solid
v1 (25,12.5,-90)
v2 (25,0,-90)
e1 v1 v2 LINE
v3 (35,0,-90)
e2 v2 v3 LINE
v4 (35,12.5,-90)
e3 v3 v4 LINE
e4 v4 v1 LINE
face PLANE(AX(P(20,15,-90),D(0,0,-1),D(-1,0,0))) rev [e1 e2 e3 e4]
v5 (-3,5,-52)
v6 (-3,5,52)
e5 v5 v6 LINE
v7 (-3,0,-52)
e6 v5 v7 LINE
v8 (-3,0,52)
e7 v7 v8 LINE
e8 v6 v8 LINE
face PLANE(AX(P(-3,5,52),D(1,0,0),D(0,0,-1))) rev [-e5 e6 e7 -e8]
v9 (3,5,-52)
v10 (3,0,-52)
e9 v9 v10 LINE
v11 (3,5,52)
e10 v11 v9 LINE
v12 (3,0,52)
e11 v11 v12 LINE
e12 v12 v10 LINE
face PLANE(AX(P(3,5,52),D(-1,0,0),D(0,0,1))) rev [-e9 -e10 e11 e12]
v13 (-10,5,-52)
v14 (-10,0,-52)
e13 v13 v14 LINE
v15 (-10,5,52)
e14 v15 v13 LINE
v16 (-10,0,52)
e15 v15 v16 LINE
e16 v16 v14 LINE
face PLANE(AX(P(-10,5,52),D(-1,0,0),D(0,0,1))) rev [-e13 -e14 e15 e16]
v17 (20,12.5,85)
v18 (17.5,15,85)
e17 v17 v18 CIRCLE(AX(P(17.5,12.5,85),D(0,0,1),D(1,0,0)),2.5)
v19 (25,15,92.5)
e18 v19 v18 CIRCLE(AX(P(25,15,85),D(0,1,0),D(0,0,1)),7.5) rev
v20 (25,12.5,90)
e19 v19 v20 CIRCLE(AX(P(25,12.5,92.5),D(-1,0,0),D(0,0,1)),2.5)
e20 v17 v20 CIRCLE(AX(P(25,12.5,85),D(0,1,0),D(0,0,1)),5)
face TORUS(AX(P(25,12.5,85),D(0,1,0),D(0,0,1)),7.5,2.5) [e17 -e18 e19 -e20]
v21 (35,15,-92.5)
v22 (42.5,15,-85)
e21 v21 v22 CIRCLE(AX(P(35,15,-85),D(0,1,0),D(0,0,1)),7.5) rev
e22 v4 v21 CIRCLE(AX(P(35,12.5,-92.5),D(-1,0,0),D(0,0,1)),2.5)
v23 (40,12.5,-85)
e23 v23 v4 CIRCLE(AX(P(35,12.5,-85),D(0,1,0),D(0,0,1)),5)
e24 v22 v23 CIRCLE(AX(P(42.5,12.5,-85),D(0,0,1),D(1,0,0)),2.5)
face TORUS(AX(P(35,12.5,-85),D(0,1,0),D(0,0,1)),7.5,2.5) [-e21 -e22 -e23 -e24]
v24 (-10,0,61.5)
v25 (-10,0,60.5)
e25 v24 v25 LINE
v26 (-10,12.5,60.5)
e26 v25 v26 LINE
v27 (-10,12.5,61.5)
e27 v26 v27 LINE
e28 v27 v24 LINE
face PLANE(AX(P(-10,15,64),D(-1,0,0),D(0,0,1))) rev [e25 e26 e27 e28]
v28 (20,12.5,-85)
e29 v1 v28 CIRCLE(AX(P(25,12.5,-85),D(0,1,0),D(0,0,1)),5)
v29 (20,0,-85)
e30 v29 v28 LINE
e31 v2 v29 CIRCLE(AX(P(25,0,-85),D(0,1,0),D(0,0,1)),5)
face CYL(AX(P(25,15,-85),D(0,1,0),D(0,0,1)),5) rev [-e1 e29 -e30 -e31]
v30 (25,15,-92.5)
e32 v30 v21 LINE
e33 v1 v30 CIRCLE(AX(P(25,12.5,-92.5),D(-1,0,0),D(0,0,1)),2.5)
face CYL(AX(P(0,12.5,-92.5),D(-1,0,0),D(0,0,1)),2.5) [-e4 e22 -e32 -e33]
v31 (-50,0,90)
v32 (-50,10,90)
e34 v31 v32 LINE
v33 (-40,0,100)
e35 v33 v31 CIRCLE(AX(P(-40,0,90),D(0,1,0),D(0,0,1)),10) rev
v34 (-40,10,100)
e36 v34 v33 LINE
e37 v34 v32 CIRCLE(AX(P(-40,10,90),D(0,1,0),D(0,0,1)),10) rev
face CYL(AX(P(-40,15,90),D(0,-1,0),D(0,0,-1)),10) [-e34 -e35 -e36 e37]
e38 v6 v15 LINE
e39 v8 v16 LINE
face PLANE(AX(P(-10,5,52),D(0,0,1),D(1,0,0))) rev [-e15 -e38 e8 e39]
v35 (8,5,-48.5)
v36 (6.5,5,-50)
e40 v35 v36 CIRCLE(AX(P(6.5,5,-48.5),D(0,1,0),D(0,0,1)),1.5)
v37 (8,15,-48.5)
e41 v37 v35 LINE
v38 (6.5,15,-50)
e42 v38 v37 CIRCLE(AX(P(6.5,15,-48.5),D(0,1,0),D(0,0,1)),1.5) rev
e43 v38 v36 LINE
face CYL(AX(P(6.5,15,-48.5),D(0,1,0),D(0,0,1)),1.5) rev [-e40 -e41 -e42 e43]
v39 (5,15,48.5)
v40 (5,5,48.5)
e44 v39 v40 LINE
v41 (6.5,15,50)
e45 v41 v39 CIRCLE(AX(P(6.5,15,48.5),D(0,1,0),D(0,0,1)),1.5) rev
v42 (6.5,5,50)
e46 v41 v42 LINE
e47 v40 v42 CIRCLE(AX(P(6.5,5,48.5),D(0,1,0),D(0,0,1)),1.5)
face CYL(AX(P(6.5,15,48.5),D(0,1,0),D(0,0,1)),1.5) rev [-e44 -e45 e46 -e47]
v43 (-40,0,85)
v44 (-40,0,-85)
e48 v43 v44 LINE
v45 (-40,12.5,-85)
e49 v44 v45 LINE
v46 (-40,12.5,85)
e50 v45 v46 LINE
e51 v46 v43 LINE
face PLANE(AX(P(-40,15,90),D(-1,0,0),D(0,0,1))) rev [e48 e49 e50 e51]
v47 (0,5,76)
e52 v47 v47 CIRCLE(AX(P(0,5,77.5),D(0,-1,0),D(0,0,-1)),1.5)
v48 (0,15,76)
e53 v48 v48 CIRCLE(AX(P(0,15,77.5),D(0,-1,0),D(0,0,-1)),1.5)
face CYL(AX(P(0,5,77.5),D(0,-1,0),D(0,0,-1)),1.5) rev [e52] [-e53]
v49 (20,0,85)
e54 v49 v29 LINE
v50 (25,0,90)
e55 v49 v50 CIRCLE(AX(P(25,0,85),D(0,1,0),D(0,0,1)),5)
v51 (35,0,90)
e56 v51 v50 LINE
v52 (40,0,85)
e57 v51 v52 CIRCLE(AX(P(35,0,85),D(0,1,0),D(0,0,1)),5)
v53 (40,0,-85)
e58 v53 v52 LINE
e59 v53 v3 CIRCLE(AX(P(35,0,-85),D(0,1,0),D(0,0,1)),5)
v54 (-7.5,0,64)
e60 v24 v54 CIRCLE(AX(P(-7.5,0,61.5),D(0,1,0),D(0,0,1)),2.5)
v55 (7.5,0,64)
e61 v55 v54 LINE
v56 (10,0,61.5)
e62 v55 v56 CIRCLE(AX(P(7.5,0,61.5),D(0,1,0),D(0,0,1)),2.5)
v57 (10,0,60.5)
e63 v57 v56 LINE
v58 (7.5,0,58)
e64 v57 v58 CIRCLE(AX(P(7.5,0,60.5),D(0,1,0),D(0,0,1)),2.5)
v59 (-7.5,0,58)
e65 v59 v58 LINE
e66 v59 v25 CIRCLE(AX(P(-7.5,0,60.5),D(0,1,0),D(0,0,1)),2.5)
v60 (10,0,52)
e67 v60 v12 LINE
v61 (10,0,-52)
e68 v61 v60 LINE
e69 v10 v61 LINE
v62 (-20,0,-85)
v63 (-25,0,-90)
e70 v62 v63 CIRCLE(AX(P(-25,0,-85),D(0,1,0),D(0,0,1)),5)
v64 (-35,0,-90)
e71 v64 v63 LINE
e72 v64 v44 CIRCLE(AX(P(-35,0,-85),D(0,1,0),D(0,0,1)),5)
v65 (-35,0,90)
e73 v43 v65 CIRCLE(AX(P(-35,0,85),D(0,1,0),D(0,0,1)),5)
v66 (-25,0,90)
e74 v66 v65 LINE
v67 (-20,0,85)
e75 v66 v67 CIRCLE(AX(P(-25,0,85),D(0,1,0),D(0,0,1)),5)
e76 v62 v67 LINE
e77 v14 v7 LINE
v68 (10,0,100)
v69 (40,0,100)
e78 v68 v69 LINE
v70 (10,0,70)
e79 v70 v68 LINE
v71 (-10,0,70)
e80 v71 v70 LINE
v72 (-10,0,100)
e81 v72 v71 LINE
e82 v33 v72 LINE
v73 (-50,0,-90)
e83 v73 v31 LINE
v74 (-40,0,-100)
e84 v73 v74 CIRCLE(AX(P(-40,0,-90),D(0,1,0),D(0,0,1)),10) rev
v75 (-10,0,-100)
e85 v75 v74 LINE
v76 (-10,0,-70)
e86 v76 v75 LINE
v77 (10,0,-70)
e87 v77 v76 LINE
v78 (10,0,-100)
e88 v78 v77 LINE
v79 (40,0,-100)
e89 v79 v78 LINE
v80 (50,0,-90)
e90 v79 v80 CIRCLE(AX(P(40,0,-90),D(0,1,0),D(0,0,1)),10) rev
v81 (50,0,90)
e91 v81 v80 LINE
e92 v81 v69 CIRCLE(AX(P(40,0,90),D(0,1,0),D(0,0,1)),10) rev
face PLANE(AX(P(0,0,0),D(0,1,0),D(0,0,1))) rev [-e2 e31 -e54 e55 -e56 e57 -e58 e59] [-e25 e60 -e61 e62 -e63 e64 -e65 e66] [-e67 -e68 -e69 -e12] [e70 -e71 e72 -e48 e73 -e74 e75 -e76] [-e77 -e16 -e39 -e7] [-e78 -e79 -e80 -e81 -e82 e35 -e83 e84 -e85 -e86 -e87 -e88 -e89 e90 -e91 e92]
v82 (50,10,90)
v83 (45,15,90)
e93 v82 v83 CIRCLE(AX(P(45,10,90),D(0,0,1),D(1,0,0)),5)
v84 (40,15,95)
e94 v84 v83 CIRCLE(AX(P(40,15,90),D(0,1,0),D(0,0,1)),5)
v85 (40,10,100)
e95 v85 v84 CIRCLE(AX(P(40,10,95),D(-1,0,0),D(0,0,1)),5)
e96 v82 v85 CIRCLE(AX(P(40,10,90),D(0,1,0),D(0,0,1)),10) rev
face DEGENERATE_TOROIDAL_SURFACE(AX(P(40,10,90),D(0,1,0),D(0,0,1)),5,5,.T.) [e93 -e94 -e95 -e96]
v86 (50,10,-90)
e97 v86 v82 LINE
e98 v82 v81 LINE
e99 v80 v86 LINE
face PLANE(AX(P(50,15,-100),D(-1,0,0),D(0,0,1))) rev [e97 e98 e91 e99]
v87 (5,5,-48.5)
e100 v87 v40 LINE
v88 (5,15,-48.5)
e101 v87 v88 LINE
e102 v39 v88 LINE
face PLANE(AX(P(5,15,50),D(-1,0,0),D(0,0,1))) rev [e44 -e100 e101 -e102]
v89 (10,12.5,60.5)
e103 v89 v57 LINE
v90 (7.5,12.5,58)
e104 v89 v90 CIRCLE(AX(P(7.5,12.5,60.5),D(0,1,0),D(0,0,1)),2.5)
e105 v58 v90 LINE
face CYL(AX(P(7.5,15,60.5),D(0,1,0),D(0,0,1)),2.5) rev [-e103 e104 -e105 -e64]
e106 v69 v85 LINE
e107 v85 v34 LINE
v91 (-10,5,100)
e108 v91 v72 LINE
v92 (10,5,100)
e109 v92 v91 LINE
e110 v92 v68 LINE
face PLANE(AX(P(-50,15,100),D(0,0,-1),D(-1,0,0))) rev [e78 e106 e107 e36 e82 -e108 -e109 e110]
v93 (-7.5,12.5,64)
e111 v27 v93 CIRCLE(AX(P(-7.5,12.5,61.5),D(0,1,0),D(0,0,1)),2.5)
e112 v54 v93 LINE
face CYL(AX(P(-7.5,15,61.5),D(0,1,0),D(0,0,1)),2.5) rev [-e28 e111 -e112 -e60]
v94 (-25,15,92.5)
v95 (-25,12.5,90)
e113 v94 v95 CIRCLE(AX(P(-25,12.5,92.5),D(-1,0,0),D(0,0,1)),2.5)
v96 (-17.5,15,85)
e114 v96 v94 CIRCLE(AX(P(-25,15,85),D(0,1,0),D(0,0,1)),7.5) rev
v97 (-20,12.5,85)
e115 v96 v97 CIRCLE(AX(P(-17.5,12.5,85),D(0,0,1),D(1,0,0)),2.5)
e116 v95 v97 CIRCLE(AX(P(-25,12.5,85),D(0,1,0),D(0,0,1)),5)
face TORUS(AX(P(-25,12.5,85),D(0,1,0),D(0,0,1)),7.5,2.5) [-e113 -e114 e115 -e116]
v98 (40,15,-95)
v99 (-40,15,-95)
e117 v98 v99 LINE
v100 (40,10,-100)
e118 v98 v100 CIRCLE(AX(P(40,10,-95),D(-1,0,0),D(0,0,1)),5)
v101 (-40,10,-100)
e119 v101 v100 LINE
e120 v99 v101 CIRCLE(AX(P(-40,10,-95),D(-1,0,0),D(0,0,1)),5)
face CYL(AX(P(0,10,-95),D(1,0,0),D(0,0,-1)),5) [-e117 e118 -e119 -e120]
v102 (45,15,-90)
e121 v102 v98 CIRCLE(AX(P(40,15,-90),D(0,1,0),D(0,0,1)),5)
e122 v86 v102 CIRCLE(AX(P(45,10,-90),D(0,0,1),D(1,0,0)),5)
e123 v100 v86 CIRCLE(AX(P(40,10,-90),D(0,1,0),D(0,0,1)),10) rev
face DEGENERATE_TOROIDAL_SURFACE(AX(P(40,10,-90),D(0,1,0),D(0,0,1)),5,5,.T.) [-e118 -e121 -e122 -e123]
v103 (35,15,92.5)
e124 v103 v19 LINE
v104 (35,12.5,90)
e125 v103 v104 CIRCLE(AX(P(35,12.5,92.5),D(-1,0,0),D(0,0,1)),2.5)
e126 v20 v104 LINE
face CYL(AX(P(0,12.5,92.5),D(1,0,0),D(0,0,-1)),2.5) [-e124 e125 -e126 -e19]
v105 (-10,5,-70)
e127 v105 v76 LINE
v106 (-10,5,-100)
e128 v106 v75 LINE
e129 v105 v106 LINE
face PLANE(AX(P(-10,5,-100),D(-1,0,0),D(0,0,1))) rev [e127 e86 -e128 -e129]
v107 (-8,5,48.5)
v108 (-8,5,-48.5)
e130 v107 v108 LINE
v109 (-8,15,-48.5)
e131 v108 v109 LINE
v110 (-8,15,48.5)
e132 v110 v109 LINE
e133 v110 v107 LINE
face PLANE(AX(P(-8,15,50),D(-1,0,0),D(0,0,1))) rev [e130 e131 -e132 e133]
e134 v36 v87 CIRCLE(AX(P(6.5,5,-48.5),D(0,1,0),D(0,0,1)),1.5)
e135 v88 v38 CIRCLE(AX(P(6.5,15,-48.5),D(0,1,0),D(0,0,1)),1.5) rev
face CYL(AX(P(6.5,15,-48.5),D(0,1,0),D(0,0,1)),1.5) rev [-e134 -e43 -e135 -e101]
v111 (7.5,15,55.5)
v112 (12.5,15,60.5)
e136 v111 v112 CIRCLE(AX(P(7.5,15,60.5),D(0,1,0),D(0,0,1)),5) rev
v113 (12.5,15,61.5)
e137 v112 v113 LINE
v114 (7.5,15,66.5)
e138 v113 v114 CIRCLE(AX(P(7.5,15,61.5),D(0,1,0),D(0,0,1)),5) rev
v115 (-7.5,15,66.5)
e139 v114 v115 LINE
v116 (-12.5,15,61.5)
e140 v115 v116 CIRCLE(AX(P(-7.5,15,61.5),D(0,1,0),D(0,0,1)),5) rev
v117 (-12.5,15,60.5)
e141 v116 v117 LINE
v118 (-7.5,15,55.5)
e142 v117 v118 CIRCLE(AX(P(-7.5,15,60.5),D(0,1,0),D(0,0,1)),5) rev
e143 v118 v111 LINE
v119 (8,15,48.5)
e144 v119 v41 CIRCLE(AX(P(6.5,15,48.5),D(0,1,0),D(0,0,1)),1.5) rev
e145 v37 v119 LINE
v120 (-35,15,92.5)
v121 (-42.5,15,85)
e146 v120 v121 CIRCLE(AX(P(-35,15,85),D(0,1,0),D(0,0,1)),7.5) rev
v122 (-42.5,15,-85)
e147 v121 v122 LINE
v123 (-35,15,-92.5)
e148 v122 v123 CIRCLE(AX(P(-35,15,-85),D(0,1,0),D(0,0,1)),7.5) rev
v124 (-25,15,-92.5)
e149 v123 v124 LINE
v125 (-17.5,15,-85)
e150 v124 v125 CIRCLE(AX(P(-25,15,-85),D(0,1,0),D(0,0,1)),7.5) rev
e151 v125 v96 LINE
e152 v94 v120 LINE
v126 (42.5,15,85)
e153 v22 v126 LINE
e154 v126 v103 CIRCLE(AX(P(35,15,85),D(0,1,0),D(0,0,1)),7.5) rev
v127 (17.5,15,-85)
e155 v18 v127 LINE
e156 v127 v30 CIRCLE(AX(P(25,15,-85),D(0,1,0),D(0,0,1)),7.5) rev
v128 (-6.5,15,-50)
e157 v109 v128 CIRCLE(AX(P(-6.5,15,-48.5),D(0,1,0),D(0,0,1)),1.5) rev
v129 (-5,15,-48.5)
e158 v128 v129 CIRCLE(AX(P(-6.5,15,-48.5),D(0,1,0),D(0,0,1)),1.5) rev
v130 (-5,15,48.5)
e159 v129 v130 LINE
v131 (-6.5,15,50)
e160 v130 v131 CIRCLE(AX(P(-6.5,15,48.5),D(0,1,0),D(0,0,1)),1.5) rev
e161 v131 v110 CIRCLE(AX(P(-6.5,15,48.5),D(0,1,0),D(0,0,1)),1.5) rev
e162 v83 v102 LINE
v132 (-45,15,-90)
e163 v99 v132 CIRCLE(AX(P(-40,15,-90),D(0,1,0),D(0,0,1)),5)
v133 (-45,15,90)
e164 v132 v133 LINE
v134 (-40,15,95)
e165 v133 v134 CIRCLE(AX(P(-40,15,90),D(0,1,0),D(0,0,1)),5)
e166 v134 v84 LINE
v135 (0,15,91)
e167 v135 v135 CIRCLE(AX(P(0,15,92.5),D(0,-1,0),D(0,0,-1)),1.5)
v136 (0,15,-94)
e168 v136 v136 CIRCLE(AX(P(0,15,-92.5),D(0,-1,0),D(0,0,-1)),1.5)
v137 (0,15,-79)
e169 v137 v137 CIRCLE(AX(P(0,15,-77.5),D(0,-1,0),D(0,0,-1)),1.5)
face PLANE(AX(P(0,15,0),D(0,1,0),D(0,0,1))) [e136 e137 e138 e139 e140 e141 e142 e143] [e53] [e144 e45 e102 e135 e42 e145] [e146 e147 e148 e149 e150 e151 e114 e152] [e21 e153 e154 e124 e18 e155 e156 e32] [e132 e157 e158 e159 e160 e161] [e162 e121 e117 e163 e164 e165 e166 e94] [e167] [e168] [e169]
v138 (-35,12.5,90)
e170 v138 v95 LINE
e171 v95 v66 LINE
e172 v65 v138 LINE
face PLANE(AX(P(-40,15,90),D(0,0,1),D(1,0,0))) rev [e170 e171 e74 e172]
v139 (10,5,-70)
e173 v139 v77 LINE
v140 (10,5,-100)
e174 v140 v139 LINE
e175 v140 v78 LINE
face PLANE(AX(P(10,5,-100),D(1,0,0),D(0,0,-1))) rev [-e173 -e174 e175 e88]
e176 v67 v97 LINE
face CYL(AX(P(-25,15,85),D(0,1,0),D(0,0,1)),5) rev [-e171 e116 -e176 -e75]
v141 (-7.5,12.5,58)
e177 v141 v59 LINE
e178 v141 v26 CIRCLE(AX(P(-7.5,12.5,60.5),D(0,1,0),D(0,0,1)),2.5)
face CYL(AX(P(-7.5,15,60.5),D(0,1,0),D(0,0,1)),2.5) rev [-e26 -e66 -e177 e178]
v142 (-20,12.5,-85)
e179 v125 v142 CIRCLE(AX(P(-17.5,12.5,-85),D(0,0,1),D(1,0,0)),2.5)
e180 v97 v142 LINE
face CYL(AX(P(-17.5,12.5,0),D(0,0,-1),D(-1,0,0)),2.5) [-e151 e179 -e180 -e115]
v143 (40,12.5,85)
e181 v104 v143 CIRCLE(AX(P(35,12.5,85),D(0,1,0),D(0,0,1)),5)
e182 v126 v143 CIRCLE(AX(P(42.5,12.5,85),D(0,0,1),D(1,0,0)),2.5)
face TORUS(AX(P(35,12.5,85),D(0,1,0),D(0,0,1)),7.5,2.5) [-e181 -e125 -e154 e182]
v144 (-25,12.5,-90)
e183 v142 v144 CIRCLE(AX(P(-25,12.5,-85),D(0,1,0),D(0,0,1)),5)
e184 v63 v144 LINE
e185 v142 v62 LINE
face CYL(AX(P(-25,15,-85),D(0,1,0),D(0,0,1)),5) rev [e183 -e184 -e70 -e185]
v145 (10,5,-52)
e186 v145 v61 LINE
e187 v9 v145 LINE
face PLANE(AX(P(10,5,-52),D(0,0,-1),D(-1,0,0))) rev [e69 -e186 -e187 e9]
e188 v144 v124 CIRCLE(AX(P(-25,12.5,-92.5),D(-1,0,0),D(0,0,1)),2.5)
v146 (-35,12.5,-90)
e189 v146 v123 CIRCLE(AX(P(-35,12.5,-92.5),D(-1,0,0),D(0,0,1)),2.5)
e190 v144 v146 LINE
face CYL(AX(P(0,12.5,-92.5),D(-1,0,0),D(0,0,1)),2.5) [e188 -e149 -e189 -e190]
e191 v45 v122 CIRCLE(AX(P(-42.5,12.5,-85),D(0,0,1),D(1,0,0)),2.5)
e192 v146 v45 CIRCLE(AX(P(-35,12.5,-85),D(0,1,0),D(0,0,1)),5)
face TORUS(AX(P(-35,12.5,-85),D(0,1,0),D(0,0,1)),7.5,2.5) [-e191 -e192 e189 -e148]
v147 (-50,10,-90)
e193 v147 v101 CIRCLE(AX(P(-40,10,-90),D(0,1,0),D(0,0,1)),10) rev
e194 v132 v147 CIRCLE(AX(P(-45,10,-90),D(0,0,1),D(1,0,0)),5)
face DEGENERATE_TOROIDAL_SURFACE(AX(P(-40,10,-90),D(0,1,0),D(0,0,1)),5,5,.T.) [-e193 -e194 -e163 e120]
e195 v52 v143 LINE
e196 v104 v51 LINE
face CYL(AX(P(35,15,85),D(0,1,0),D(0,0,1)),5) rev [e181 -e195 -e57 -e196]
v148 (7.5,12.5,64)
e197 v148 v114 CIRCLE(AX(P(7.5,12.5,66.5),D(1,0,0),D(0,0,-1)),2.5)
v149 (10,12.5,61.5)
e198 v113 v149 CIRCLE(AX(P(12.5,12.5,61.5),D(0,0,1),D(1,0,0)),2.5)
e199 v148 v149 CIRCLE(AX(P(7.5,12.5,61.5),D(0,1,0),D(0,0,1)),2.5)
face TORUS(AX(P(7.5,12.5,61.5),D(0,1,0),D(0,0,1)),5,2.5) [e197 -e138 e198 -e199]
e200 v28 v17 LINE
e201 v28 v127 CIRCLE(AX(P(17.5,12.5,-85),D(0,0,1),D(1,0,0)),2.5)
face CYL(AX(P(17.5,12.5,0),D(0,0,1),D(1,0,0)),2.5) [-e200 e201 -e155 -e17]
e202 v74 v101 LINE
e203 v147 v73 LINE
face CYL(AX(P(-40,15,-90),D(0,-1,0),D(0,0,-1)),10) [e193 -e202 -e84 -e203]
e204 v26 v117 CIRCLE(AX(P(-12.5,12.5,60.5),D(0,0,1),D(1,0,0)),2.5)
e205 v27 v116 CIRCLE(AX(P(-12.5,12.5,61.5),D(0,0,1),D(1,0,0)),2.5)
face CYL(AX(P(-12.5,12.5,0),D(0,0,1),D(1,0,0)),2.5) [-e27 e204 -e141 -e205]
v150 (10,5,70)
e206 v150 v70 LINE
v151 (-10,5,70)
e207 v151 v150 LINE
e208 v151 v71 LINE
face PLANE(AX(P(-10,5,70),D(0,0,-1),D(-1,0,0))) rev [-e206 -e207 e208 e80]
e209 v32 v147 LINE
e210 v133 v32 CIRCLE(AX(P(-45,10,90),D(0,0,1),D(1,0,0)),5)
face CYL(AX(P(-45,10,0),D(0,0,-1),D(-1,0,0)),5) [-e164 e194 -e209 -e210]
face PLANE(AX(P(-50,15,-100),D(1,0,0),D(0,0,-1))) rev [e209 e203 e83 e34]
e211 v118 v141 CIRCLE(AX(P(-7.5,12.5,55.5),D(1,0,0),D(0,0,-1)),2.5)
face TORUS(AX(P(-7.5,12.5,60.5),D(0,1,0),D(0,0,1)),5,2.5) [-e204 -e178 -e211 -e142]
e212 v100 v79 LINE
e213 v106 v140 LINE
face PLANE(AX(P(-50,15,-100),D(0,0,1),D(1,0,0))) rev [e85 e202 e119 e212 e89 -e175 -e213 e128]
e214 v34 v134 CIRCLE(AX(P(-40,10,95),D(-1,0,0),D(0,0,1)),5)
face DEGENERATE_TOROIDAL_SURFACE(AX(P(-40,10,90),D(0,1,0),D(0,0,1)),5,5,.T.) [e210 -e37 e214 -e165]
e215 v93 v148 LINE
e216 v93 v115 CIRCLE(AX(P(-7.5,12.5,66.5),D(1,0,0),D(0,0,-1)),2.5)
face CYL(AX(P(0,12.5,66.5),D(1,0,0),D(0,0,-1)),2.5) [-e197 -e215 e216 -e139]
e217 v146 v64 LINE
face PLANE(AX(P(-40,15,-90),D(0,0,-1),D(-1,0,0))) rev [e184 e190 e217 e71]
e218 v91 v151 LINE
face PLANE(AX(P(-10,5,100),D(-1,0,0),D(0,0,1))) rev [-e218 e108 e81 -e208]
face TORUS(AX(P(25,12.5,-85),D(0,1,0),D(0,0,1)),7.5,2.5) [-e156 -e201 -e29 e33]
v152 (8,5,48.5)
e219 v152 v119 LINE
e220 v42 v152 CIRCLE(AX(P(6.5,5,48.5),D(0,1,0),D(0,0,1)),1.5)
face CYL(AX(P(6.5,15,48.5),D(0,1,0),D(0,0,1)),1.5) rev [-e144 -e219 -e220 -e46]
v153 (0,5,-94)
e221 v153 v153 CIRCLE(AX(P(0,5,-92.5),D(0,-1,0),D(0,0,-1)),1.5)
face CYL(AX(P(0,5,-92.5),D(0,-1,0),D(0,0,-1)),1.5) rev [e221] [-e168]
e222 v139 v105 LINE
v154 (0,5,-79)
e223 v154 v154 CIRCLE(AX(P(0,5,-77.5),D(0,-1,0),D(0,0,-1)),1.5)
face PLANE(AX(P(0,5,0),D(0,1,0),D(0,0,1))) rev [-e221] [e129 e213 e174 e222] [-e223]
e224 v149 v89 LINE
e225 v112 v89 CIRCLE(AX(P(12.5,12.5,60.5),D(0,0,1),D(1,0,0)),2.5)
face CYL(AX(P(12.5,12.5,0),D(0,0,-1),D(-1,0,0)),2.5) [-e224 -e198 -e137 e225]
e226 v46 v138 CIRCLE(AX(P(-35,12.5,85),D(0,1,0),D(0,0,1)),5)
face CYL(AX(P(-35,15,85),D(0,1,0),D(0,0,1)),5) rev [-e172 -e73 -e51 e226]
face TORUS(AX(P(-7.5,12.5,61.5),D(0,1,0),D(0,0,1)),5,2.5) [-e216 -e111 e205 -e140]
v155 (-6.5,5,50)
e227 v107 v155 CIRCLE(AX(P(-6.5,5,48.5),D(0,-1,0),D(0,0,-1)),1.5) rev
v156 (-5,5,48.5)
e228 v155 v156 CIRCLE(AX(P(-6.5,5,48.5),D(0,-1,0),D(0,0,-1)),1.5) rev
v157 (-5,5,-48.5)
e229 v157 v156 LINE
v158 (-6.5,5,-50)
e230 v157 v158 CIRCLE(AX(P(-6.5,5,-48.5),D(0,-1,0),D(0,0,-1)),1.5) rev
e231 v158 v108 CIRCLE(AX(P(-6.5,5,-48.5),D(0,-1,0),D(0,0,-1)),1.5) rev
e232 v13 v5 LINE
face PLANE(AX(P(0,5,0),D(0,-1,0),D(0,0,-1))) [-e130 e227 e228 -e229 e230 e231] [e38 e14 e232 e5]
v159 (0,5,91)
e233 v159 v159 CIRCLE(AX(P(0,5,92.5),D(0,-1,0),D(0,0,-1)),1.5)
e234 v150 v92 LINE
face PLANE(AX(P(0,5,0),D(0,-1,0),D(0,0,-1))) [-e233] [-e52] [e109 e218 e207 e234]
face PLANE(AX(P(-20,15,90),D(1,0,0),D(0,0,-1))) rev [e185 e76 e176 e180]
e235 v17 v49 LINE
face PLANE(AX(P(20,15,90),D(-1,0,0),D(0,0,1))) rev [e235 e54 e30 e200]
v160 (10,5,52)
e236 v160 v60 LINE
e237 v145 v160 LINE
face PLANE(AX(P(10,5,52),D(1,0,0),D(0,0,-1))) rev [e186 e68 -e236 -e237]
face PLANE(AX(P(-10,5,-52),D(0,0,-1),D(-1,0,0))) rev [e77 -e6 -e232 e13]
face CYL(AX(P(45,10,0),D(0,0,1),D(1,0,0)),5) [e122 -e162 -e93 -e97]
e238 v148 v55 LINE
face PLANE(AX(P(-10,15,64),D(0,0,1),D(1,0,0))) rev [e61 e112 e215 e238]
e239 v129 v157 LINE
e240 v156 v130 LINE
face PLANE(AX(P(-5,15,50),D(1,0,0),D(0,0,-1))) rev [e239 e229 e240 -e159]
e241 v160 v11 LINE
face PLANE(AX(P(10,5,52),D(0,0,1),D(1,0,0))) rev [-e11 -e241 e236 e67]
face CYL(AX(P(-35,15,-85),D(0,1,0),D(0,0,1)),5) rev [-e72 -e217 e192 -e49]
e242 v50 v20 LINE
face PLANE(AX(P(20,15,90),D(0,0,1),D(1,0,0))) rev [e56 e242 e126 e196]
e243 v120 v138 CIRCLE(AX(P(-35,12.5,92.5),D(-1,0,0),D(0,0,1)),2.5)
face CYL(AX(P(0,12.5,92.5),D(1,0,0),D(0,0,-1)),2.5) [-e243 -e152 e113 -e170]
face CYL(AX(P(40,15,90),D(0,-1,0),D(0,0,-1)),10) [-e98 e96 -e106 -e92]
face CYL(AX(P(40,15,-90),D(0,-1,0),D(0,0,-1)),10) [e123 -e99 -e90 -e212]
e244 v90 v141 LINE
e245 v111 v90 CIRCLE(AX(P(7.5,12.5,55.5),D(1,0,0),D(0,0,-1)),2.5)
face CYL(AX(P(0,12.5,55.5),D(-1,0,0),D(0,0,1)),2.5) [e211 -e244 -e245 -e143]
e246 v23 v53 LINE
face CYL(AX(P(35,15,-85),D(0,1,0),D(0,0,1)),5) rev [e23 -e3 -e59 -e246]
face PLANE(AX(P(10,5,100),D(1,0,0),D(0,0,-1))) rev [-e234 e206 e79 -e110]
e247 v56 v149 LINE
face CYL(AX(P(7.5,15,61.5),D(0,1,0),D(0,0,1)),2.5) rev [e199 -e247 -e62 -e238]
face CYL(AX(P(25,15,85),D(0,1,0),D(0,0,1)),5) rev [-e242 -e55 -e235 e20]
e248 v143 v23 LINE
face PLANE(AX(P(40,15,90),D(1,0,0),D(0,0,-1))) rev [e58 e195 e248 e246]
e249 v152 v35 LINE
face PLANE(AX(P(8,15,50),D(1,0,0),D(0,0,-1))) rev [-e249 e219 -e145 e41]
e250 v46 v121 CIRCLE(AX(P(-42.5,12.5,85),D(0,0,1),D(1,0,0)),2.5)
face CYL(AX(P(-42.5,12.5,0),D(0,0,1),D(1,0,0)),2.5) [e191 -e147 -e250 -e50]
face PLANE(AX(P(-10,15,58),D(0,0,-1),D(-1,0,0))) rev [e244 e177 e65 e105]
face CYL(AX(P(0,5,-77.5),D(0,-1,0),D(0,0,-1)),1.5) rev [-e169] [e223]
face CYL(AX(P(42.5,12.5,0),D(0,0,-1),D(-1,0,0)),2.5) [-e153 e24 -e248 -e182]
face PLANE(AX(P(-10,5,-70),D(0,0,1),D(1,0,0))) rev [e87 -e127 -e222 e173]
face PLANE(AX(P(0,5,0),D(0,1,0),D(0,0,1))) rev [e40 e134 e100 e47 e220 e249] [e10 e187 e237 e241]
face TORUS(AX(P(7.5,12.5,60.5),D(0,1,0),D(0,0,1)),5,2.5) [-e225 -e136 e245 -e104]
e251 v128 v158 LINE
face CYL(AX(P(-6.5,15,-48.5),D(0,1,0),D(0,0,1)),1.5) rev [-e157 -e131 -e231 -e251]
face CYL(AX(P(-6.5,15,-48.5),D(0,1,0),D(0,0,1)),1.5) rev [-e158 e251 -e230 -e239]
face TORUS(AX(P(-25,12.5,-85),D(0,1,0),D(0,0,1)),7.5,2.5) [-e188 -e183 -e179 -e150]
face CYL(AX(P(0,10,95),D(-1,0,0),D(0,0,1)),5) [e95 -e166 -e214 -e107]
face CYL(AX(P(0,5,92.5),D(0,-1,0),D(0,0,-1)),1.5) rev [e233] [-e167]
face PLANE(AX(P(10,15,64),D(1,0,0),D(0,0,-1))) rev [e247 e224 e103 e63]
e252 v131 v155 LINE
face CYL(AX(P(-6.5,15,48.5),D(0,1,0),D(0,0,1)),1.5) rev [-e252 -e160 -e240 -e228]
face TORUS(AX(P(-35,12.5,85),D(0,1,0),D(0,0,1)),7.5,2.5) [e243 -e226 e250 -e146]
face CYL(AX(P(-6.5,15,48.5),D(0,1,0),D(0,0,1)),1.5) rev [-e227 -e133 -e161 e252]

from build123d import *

# Parameters (mm, degrees)
SKETCH1_W             = 100
SKETCH1_H             = 200
BOSS_EXTRUDE1_DEPTH   = 15
SKETCH4_W             = 20
SKETCH4_H             = 30
SKETCH4_W_2           = 7
SKETCH4_H_2           = 104
CUT_EXTRUDE2_DEPTH    = 5
FILLET3_R             = 10
FILLET4_R             = 5
SKETCH8_W             = 20
SKETCH8_H             = 180
SKETCH8_W_2           = 3
SKETCH8_H_2           = 100
SKETCH8_H_3           = 6
CUT_EXTRUDE3_DEPTH    = 15
FILLET5_R             = 5
FILLET8_R             = 2.5
FILLET7_R             = 2.5
FILLET10_R            = 1.5
F_3_0MM_DOWEL_HOLE1_D = 3
F_3_0MM_DOWEL_HOLE2_D = 3


with BuildPart() as part:
    # Sketch1 → Boss-Extrude1 (new body)
    with BuildSketch(Plane(origin=(0, 0, 0), x_dir=(1, 0, 0), z_dir=(0, 1, 0))):
        Rectangle(SKETCH1_W, SKETCH1_H)
    extrude(amount=BOSS_EXTRUDE1_DEPTH)

    # Sketch4 → Cut-Extrude2 (cut)
    with BuildSketch(Plane.XZ):
        with Locations((0, 85)):
            Rectangle(SKETCH4_W, SKETCH4_H)
        with Locations((0, -85)):
            Rectangle(SKETCH4_W, SKETCH4_H)
        with Locations((-6.5, 0)):
            Rectangle(SKETCH4_W_2, SKETCH4_H_2)
        with Locations((6.5, 0)):
            Rectangle(SKETCH4_W_2, SKETCH4_H_2)
    extrude(amount=-CUT_EXTRUDE2_DEPTH, mode=Mode.SUBTRACT)

    # Fillet3
    fillet3_edges = [part.edges().sort_by_distance(p)[0] for p in [
        (50, 7.5, 100),
        (-50, 7.5, 100),
        (-50, 7.5, -100),
        (50, 7.5, -100),
    ]]
    fillet(fillet3_edges, radius=FILLET3_R)

    # Fillet4
    fillet4_edges = [part.edges().sort_by_distance(p)[0] for p in [
        (0, 15, -100),
        (50, 15, 0),
        (-50, 15, 0),
        (0, 15, 100),
        (47.071067812, 15, 97.071067812),
        (-47.071067812, 15, 97.071067812),
        (-47.071067812, 15, -97.071067812),
        (47.071067812, 15, -97.071067812),
    ]]
    fillet(fillet4_edges, radius=FILLET4_R)

    # Sketch8 → Cut-Extrude3 (cut)
    with BuildSketch(Plane.XZ):
        with Locations((30, 0)):
            Rectangle(SKETCH8_W, SKETCH8_H)
        with Locations((-30, 0)):
            Rectangle(SKETCH8_W, SKETCH8_H)
        with Locations((-6.5, 0)):
            Rectangle(SKETCH8_W_2, SKETCH8_H_2)
        with Locations((6.5, 0)):
            Rectangle(SKETCH8_W_2, SKETCH8_H_2)
        with Locations((0, 61)):
            Rectangle(SKETCH8_W, SKETCH8_H_3)
    extrude(amount=-CUT_EXTRUDE3_DEPTH, mode=Mode.SUBTRACT)

    # Fillet5
    fillet5_edges = [part.edges().sort_by_distance(p)[0] for p in [
        (20, 7.5, -90),
        (20, 7.5, 90),
        (40, 7.5, 90),
        (40, 7.5, -90),
        (-40, 7.5, -90),
        (-40, 7.5, 90),
        (-20, 7.5, 90),
        (-20, 7.5, -90),
    ]]
    fillet(fillet5_edges, radius=FILLET5_R)

    # Fillet8
    fillet8_edges = [part.edges().sort_by_distance(p)[0] for p in [
        (-10, 7.5, 58),
        (-10, 7.5, 64),
        (10, 7.5, 64),
        (10, 7.5, 58),
    ]]
    fillet(fillet8_edges, radius=FILLET8_R)

    # Fillet7
    fillet7_edges = [part.edges().sort_by_distance(p)[0] for p in [
        (-30, 15, -90),
        (-40, 15, 0),
        (-20, 15, 0),
        (30, 15, -90),
        (20, 15, 0),
        (40, 15, 0),
        (-30, 15, 90),
        (30, 15, 90),
        (-38.535533906, 15, -88.535533906),
        (-21.464466094, 15, -88.535533906),
        (21.464466094, 15, -88.535533906),
        (38.535533906, 15, -88.535533906),
        (-21.464466094, 15, 88.535533906),
        (-38.535533906, 15, 88.535533906),
        (21.464466094, 15, 88.535533906),
        (38.535533906, 15, 88.535533906),
        (0, 15, 64),
        (10, 15, 61),
        (0, 15, 58),
        (-10, 15, 61),
        (9.267766953, 15, 63.267766953),
        (9.267766953, 15, 58.732233047),
        (-9.267766953, 15, 58.732233047),
        (-9.267766953, 15, 63.267766953),
    ]]
    fillet(fillet7_edges, radius=FILLET7_R)

    # Fillet10
    fillet10_edges = [part.edges().sort_by_distance(p)[0] for p in [
        (8, 10, -50),
        (5, 10, -50),
        (-5, 10, -50),
        (-8, 10, -50),
        (5, 10, 50),
        (8, 10, 50),
        (-8, 10, 50),
        (-5, 10, 50),
    ]]
    fillet(fillet10_edges, radius=FILLET10_R - 0.0001)  # a hair under: the kernel refuses the full size

    # Ø3.0mm Dowel Hole1 (through all)
    with Locations(Plane(origin=(0, 5, 0), x_dir=(-1, 0, 0), z_dir=(0, -1, 0))):
        with Locations((0, 77.5), (0, 92.5)):
            Hole(F_3_0MM_DOWEL_HOLE1_D / 2)

    # Ø3.0mm Dowel Hole2 (through all)
    with Locations(Plane(origin=(0, 5, 0), x_dir=(-1, 0, 0), z_dir=(0, -1, 0))):
        with Locations((0, -92.5), (0, -77.5)):
            Hole(F_3_0MM_DOWEL_HOLE2_D / 2)


solid = part.part
